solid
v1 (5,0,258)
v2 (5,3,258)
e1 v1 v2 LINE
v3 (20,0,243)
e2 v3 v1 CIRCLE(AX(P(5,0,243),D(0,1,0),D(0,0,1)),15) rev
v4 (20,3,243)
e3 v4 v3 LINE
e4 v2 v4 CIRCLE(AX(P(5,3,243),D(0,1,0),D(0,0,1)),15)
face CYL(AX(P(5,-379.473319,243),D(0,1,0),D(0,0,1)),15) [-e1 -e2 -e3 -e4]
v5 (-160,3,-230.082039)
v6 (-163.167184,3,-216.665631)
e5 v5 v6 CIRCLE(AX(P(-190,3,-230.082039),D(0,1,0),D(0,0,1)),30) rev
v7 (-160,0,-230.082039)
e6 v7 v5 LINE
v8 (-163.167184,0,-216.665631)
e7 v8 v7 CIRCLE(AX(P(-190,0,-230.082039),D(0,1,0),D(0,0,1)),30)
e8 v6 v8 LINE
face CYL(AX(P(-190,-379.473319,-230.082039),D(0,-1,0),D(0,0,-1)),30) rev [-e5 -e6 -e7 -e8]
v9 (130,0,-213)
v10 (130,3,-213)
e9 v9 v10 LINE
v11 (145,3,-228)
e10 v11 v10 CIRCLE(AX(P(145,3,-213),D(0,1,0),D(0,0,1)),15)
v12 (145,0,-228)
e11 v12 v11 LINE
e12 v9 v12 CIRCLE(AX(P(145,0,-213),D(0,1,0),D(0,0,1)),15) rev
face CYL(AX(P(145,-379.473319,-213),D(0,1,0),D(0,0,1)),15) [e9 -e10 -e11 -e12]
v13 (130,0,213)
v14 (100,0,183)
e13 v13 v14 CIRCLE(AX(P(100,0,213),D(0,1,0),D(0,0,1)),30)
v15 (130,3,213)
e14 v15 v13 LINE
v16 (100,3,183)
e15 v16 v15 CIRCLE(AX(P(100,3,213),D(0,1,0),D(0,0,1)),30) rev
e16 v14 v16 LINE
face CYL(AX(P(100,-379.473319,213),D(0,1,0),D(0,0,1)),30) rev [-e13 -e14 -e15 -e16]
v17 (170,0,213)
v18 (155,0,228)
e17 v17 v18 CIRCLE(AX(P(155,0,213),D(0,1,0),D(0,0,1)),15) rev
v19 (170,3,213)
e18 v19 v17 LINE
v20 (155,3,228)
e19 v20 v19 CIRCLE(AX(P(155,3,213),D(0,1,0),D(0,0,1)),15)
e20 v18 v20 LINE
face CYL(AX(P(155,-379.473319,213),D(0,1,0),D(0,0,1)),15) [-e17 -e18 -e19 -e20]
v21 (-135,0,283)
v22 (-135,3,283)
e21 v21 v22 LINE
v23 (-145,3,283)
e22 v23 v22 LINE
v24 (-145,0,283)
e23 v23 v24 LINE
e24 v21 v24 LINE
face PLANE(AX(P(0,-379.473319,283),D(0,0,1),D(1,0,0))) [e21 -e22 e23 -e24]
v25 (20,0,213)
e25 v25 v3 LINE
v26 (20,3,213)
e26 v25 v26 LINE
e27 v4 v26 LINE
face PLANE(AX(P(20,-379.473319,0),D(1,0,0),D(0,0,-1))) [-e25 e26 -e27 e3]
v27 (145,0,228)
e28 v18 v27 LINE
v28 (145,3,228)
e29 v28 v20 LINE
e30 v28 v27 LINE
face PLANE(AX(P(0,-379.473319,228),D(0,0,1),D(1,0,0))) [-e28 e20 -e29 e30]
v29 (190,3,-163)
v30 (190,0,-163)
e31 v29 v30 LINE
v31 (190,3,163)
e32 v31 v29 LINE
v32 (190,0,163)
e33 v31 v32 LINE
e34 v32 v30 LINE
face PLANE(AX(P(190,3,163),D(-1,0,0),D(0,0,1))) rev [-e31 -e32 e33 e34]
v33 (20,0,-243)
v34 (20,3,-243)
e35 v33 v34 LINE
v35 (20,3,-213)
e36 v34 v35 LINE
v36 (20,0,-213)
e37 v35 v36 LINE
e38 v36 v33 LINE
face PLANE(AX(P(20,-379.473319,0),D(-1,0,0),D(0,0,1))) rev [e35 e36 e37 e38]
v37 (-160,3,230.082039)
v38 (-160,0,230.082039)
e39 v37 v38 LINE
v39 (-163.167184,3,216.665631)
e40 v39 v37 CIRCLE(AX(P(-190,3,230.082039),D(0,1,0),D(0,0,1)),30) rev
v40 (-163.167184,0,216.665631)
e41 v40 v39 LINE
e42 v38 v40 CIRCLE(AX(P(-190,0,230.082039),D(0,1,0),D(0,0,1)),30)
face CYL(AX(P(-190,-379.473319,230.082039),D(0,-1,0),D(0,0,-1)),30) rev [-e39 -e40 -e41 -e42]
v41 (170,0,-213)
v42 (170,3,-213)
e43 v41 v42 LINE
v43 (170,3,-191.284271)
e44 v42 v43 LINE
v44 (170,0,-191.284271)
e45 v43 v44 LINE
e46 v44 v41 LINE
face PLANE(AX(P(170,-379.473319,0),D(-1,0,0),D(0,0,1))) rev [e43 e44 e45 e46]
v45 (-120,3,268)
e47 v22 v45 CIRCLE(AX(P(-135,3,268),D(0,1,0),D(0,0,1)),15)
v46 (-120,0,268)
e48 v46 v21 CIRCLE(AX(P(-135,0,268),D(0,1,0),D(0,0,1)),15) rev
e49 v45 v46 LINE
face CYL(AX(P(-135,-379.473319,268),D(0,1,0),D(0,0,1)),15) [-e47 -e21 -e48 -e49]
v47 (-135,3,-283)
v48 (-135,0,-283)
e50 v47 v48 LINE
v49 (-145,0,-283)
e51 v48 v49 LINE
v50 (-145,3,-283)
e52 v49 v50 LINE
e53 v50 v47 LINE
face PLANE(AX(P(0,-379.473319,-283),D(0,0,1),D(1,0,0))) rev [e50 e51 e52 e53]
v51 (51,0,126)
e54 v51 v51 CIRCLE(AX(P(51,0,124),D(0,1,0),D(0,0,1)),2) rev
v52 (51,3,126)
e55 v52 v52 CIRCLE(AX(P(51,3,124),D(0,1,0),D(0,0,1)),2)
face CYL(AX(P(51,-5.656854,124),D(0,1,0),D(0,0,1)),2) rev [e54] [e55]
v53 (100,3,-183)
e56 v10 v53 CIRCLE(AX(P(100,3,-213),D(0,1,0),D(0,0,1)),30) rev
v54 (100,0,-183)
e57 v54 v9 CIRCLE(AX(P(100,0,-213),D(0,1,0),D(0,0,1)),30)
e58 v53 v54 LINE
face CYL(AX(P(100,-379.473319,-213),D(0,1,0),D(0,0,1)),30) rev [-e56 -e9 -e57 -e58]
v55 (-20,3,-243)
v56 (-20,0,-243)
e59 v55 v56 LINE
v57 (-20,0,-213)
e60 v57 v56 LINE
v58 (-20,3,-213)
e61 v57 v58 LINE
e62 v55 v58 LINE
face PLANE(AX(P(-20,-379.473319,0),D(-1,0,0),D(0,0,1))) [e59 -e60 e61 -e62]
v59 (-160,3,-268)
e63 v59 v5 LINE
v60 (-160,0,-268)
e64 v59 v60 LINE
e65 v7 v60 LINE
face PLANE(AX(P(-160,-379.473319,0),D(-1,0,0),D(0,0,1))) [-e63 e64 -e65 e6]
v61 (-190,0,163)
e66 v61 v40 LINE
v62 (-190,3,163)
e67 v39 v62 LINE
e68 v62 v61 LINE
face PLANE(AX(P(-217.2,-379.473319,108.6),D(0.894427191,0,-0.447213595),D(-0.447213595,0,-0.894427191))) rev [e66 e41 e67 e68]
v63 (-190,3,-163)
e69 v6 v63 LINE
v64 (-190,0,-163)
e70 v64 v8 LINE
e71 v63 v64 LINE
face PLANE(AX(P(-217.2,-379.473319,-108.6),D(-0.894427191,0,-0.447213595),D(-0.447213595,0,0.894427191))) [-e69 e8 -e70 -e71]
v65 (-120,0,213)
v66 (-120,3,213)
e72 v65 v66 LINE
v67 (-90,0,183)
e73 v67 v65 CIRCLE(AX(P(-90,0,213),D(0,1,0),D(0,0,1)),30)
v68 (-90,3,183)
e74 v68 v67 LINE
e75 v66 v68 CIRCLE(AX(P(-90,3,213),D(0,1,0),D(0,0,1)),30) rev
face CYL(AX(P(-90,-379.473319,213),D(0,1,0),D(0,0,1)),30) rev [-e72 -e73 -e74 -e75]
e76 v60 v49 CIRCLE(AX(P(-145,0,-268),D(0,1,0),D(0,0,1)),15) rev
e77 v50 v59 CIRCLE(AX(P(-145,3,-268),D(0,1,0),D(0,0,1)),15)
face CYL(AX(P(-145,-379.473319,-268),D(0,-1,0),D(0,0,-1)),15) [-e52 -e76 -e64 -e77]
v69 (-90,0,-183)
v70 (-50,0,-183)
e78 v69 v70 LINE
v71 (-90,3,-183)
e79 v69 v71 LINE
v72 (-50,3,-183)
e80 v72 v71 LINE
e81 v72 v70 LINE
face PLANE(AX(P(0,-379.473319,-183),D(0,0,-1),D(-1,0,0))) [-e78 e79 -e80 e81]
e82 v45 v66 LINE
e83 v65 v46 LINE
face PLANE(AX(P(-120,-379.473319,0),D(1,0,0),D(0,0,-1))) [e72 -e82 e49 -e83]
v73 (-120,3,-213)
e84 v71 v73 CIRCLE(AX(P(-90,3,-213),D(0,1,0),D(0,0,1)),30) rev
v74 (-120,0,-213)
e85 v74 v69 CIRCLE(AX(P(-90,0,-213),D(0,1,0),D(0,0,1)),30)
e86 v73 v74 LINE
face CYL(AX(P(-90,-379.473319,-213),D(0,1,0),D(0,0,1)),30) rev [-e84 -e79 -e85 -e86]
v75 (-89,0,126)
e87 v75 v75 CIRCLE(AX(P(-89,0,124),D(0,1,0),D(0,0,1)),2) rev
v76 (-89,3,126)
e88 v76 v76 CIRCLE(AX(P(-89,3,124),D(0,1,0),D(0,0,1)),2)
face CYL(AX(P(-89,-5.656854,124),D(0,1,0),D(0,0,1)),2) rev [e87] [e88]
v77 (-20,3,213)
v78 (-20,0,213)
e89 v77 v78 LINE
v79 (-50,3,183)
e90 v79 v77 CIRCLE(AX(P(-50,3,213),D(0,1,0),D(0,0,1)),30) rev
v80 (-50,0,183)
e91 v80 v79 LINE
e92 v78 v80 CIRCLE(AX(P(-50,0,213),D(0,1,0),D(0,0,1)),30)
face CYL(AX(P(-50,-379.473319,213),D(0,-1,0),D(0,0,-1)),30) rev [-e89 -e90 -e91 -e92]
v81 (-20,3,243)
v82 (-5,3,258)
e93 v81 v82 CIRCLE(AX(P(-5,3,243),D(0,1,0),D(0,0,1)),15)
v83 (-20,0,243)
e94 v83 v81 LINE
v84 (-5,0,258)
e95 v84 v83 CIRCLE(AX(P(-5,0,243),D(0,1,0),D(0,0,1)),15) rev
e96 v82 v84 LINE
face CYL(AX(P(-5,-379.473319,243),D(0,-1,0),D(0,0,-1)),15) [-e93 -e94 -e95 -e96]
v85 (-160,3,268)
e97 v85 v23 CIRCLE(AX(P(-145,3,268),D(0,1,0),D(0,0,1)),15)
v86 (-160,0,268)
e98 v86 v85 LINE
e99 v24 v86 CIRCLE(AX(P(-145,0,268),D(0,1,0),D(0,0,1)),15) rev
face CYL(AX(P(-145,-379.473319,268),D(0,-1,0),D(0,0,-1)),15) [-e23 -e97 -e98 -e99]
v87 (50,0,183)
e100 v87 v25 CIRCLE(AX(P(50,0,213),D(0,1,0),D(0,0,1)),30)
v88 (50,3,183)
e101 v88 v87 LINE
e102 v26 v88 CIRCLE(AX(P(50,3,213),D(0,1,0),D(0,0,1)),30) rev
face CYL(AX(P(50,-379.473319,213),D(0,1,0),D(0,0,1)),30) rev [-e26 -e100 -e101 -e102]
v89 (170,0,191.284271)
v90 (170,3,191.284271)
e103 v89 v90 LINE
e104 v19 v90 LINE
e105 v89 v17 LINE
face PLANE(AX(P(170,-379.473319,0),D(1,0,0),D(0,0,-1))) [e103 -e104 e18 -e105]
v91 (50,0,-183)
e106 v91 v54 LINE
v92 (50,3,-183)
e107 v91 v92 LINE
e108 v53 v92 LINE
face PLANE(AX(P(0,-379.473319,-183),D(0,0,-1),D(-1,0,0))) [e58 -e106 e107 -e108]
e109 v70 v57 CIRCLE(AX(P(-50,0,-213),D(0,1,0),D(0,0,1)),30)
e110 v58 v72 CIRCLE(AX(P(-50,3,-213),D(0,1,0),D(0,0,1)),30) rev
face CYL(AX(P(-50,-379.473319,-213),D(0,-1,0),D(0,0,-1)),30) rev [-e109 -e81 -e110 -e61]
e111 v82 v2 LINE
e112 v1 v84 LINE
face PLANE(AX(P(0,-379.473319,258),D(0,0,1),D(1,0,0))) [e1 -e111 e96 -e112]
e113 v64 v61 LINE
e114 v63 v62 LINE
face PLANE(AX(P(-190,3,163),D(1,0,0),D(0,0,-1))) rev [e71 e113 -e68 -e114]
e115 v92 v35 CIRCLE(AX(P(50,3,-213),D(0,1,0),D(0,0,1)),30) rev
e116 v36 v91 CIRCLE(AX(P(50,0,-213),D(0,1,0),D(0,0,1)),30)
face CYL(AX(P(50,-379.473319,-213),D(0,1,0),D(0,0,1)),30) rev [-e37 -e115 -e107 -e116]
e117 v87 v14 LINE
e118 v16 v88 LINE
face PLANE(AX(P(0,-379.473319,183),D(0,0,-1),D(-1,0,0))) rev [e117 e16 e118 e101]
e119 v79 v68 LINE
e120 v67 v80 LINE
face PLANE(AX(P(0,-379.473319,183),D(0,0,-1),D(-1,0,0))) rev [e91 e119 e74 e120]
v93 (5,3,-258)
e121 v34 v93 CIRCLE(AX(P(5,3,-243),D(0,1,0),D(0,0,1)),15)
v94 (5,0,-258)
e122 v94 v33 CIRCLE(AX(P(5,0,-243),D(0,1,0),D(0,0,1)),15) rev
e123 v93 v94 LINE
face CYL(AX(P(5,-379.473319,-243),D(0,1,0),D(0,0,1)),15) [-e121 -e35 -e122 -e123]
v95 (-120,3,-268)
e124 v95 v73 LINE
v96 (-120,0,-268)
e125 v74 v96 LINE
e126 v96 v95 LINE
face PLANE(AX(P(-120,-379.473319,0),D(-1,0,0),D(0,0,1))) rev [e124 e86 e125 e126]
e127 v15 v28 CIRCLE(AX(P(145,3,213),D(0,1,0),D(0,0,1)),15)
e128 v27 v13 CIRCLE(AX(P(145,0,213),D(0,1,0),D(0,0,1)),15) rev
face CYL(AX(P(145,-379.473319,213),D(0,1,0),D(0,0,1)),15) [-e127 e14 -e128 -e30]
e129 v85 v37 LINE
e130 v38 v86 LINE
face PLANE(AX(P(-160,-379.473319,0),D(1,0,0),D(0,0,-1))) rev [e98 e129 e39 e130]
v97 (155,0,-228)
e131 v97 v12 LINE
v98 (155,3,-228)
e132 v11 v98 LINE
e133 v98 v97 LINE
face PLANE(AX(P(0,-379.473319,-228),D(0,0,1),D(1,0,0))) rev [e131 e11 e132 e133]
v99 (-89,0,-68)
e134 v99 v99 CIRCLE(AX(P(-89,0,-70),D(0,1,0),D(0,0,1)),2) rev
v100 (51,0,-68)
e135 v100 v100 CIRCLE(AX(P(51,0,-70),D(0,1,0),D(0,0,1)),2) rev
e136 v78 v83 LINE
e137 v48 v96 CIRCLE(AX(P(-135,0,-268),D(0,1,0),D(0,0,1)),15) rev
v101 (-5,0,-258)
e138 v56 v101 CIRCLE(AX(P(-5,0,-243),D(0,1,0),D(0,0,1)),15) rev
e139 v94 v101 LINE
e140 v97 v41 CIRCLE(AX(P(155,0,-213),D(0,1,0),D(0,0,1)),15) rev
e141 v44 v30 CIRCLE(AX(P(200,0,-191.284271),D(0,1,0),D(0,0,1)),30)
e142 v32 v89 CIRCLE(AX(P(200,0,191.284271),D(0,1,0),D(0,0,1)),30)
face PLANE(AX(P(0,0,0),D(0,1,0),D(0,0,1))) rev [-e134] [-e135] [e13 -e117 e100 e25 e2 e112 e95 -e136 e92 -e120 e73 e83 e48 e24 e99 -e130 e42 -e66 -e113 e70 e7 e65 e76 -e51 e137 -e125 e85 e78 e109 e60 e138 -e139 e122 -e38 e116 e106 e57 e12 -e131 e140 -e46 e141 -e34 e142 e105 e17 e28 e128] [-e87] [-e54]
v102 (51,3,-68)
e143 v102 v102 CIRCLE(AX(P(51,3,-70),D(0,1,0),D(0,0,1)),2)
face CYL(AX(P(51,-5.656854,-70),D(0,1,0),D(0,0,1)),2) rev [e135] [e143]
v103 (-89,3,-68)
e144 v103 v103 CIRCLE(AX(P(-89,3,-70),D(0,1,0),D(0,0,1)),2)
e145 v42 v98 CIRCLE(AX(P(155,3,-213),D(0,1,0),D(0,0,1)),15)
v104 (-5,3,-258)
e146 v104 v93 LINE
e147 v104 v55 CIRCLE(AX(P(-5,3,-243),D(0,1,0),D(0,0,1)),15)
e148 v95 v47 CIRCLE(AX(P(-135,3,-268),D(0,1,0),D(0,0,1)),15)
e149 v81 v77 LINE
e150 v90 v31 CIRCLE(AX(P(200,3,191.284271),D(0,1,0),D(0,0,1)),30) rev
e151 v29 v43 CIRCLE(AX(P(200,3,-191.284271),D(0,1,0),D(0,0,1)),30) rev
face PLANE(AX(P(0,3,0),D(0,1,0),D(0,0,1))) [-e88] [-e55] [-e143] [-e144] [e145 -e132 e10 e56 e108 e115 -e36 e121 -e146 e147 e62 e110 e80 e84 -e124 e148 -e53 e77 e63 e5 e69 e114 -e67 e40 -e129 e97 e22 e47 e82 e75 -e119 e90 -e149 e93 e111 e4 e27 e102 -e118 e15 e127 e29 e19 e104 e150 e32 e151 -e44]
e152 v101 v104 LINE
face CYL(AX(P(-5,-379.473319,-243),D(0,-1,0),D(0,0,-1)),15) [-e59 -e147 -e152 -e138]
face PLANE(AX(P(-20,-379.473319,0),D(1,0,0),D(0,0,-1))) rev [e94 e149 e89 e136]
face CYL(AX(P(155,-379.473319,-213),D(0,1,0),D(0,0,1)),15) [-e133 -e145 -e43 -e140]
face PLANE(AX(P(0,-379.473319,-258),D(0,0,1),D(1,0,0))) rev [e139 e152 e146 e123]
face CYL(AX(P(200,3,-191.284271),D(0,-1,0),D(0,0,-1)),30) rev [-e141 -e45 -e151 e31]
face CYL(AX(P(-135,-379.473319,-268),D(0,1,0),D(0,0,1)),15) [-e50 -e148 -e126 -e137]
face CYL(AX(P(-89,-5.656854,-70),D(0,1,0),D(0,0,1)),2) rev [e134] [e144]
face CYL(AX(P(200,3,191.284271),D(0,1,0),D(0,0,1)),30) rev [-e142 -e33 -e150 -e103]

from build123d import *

# Parameters (mm, degrees)
SKETCH1_W             = 380
SKETCH1_H             = 326
BOSS_EXTRUDE1_DEPTH   = 3
SKETCH2_R             = 2
PCB_PLATE_HOLES_DEPTH = 3
BOSS_EXTRUDE2_DEPTH   = 3
FILLET1_R             = 30
FILLET2_R             = 15


# Some blends are built 0.0001 mm under size
with BuildPart() as part:
    # Sketch1 → Boss-Extrude1 (new body)
    with BuildSketch(Plane(origin=(0, 0, 0), x_dir=(1, 0, 0), z_dir=(0, 1, 0))):
        Rectangle(SKETCH1_W, SKETCH1_H)
    extrude(amount=BOSS_EXTRUDE1_DEPTH)

    # Sketch2 → PCB Plate Holes (cut)
    with BuildSketch(Plane(origin=(0, 3, 0), x_dir=(1, 0, 0), z_dir=(0, 1, 0))):
        with Locations(Location((51, 70, 0), (0, 0, 270))):
            Circle(SKETCH2_R)
        with Locations(Location((-89, 70, 0), (0, 0, 270))):
            Circle(SKETCH2_R)
        with Locations(Location((51, -124, 0), (0, 0, 270))):
            Circle(SKETCH2_R)
        with Locations(Location((-89, -124, 0), (0, 0, 270))):
            Circle(SKETCH2_R)
    extrude(amount=-PCB_PLATE_HOLES_DEPTH, mode=Mode.SUBTRACT)

    # Sketch3 → Boss-Extrude2 (add)
    with BuildSketch(Plane(origin=(0, 3, 0), x_dir=(1, 0, 0), z_dir=(0, 1, 0))):
        Polygon((170, 163), (170, 228), (130, 228), (130, 183), (20, 183), (20, 258), (-20, 258), (-20, 183), (-120, 183), (-120, 283), (-160, 283), (-160, 223), (-190, 163), align=None)
        Polygon((170, -228), (170, -163), (-190, -163), (-160, -223), (-160, -283), (-120, -283), (-120, -183), (-20, -183), (-20, -258), (20, -258), (20, -183), (130, -183), (130, -228), align=None)
    extrude(amount=-BOSS_EXTRUDE2_DEPTH)

    # Fillet1
    # the kernel refuses this fillet: 30 mm, written as the material it adds along each edge
    with BuildSketch(Plane(origin=(130, 3, -183), x_dir=(0, 0, -1), z_dir=(0, -1, 0)), Plane(origin=(20, 3, -183), x_dir=(1, 0, 0), z_dir=(0, -1, 0)), Plane(origin=(-20, 3, -183), x_dir=(0, 0, -1), z_dir=(0, -1, 0)), Plane(origin=(-120, 3, -183), x_dir=(1, 0, 0), z_dir=(0, -1, 0)), Plane(origin=(20, 3, 183), x_dir=(0, 0, 1), z_dir=(0, -1, 0)), Plane(origin=(130, 3, 183), x_dir=(-1, 0, 0), z_dir=(0, -1, 0)), Plane(origin=(-20, 3, 183), x_dir=(-1, 0, 0), z_dir=(0, -1, 0)), Plane(origin=(-120, 3, 183), x_dir=(0, 0, 1), z_dir=(0, -1, 0))) as fillet1_piece_1:
        with BuildLine():
            CenterArc((FILLET1_R, -FILLET1_R), FILLET1_R, 90, 90)
            Line((0, -FILLET1_R), (-FILLET1_R * 0.02, -FILLET1_R))
            Line((-FILLET1_R * 0.02, -FILLET1_R), (-FILLET1_R * 0.02, FILLET1_R * 0.02))
            Line((-FILLET1_R * 0.02, FILLET1_R * 0.02), (FILLET1_R, FILLET1_R * 0.02))
            Line((FILLET1_R, FILLET1_R * 0.02), (FILLET1_R, 0))
        make_face()
    extrude(amount=3)
    with BuildSketch(Plane(origin=(170, 3, -163), x_dir=(1, 0, 0), z_dir=(0, -1, 0))) as fillet1_piece_2:
        with BuildLine():
            CenterArc((30, -28.284271247), FILLET1_R, 109.471220634, 70.528779366)
            Line((0, -28.284271247), (-0.6, -28.284271247))
            Line((-0.6, -28.284271247), (-0.6, 0))
            Line((-0.6, 0), (0, 0.6))
            ThreePointArc((0, 0.6), (10, 0.6), (19.8, 0.565685425))
            Line((19.8, 0.565685425), (20, 0))
        make_face()
    extrude(amount=3)
    with BuildSketch(Plane(origin=(170, 3, 163), x_dir=(1, 0, 0), z_dir=(0, -1, 0))) as fillet1_piece_3:
        with BuildLine():
            CenterArc((30, 28.284271247), FILLET1_R, 180, 70.528779366)
            Line((0, 28.284271247), (-0.6, 28.284271247))
            Line((-0.6, 28.284271247), (-0.6, 0))
            Line((-0.6, 0), (0, -0.6))
            ThreePointArc((0, -0.6), (10, -0.6), (19.8, -0.565685425))
            Line((19.8, -0.565685425), (20, 0))
        make_face()
    extrude(amount=3)
    with BuildSketch(Plane(origin=(-160, 3, -223), x_dir=(-0.44721359549995476, 0, 0.8944271909999175), z_dir=(0, -1, 0))) as fillet1_piece_4:
        with BuildLine():
            CenterArc((FILLET1_R * 0.2360679775, FILLET1_R), FILLET1_R, 243.434948823, 26.565051177)
            Line((-FILLET1_R * 0.211145618, FILLET1_R * 0.105572809), (-FILLET1_R * 0.22008988991, FILLET1_R * 0.0876842651801))
            Line((-FILLET1_R * 0.22008988991, FILLET1_R * 0.0876842651801), (-FILLET1_R * 0.00472135955, -FILLET1_R * 0.02))
            Line((-FILLET1_R * 0.00472135955, -FILLET1_R * 0.02), (FILLET1_R * 0.2360679775, -FILLET1_R * 0.02))
            Line((FILLET1_R * 0.2360679775, -FILLET1_R * 0.02), (FILLET1_R * 0.2360679775, 0))
        make_face()
    extrude(amount=3)
    with BuildSketch(Plane(origin=(-160, 3, 223), x_dir=(-0.4472135954999563, 0, -0.8944271909999166), z_dir=(0, -1, 0))) as fillet1_piece_5:
        with BuildLine():
            CenterArc((FILLET1_R * 0.2360679775, -FILLET1_R), FILLET1_R, 90, 26.565051177)
            Line((-FILLET1_R * 0.211145618, -FILLET1_R * 0.105572809), (-FILLET1_R * 0.22008988991, -FILLET1_R * 0.0876842651801))
            Line((-FILLET1_R * 0.22008988991, -FILLET1_R * 0.0876842651801), (-FILLET1_R * 0.00472135955, FILLET1_R * 0.02))
            Line((-FILLET1_R * 0.00472135955, FILLET1_R * 0.02), (FILLET1_R * 0.2360679775, FILLET1_R * 0.02))
            Line((FILLET1_R * 0.2360679775, FILLET1_R * 0.02), (FILLET1_R * 0.2360679775, 0))
        make_face()
    extrude(amount=3)

    # Fillet2
    fillet2_edges = [part.edges().sort_by_distance(p)[0] for p in [
        (170, 1.5, 228),
        (130, 1.5, 228),
        (20, 1.5, 258),
        (-120, 1.5, 283),
        (-20, 1.5, 258),
        (170, 1.5, -228),
        (130, 1.5, -228),
        (20, 1.5, -258),
        (-20, 1.5, -258),
        (-120, 1.5, -283),
        (-160, 1.5, -283),
        (-160, 1.5, 283),
    ]]
    fillet(fillet2_edges, radius=FILLET2_R - 0.0001)  # a hair under: the kernel refuses the full size


solid = part.part
